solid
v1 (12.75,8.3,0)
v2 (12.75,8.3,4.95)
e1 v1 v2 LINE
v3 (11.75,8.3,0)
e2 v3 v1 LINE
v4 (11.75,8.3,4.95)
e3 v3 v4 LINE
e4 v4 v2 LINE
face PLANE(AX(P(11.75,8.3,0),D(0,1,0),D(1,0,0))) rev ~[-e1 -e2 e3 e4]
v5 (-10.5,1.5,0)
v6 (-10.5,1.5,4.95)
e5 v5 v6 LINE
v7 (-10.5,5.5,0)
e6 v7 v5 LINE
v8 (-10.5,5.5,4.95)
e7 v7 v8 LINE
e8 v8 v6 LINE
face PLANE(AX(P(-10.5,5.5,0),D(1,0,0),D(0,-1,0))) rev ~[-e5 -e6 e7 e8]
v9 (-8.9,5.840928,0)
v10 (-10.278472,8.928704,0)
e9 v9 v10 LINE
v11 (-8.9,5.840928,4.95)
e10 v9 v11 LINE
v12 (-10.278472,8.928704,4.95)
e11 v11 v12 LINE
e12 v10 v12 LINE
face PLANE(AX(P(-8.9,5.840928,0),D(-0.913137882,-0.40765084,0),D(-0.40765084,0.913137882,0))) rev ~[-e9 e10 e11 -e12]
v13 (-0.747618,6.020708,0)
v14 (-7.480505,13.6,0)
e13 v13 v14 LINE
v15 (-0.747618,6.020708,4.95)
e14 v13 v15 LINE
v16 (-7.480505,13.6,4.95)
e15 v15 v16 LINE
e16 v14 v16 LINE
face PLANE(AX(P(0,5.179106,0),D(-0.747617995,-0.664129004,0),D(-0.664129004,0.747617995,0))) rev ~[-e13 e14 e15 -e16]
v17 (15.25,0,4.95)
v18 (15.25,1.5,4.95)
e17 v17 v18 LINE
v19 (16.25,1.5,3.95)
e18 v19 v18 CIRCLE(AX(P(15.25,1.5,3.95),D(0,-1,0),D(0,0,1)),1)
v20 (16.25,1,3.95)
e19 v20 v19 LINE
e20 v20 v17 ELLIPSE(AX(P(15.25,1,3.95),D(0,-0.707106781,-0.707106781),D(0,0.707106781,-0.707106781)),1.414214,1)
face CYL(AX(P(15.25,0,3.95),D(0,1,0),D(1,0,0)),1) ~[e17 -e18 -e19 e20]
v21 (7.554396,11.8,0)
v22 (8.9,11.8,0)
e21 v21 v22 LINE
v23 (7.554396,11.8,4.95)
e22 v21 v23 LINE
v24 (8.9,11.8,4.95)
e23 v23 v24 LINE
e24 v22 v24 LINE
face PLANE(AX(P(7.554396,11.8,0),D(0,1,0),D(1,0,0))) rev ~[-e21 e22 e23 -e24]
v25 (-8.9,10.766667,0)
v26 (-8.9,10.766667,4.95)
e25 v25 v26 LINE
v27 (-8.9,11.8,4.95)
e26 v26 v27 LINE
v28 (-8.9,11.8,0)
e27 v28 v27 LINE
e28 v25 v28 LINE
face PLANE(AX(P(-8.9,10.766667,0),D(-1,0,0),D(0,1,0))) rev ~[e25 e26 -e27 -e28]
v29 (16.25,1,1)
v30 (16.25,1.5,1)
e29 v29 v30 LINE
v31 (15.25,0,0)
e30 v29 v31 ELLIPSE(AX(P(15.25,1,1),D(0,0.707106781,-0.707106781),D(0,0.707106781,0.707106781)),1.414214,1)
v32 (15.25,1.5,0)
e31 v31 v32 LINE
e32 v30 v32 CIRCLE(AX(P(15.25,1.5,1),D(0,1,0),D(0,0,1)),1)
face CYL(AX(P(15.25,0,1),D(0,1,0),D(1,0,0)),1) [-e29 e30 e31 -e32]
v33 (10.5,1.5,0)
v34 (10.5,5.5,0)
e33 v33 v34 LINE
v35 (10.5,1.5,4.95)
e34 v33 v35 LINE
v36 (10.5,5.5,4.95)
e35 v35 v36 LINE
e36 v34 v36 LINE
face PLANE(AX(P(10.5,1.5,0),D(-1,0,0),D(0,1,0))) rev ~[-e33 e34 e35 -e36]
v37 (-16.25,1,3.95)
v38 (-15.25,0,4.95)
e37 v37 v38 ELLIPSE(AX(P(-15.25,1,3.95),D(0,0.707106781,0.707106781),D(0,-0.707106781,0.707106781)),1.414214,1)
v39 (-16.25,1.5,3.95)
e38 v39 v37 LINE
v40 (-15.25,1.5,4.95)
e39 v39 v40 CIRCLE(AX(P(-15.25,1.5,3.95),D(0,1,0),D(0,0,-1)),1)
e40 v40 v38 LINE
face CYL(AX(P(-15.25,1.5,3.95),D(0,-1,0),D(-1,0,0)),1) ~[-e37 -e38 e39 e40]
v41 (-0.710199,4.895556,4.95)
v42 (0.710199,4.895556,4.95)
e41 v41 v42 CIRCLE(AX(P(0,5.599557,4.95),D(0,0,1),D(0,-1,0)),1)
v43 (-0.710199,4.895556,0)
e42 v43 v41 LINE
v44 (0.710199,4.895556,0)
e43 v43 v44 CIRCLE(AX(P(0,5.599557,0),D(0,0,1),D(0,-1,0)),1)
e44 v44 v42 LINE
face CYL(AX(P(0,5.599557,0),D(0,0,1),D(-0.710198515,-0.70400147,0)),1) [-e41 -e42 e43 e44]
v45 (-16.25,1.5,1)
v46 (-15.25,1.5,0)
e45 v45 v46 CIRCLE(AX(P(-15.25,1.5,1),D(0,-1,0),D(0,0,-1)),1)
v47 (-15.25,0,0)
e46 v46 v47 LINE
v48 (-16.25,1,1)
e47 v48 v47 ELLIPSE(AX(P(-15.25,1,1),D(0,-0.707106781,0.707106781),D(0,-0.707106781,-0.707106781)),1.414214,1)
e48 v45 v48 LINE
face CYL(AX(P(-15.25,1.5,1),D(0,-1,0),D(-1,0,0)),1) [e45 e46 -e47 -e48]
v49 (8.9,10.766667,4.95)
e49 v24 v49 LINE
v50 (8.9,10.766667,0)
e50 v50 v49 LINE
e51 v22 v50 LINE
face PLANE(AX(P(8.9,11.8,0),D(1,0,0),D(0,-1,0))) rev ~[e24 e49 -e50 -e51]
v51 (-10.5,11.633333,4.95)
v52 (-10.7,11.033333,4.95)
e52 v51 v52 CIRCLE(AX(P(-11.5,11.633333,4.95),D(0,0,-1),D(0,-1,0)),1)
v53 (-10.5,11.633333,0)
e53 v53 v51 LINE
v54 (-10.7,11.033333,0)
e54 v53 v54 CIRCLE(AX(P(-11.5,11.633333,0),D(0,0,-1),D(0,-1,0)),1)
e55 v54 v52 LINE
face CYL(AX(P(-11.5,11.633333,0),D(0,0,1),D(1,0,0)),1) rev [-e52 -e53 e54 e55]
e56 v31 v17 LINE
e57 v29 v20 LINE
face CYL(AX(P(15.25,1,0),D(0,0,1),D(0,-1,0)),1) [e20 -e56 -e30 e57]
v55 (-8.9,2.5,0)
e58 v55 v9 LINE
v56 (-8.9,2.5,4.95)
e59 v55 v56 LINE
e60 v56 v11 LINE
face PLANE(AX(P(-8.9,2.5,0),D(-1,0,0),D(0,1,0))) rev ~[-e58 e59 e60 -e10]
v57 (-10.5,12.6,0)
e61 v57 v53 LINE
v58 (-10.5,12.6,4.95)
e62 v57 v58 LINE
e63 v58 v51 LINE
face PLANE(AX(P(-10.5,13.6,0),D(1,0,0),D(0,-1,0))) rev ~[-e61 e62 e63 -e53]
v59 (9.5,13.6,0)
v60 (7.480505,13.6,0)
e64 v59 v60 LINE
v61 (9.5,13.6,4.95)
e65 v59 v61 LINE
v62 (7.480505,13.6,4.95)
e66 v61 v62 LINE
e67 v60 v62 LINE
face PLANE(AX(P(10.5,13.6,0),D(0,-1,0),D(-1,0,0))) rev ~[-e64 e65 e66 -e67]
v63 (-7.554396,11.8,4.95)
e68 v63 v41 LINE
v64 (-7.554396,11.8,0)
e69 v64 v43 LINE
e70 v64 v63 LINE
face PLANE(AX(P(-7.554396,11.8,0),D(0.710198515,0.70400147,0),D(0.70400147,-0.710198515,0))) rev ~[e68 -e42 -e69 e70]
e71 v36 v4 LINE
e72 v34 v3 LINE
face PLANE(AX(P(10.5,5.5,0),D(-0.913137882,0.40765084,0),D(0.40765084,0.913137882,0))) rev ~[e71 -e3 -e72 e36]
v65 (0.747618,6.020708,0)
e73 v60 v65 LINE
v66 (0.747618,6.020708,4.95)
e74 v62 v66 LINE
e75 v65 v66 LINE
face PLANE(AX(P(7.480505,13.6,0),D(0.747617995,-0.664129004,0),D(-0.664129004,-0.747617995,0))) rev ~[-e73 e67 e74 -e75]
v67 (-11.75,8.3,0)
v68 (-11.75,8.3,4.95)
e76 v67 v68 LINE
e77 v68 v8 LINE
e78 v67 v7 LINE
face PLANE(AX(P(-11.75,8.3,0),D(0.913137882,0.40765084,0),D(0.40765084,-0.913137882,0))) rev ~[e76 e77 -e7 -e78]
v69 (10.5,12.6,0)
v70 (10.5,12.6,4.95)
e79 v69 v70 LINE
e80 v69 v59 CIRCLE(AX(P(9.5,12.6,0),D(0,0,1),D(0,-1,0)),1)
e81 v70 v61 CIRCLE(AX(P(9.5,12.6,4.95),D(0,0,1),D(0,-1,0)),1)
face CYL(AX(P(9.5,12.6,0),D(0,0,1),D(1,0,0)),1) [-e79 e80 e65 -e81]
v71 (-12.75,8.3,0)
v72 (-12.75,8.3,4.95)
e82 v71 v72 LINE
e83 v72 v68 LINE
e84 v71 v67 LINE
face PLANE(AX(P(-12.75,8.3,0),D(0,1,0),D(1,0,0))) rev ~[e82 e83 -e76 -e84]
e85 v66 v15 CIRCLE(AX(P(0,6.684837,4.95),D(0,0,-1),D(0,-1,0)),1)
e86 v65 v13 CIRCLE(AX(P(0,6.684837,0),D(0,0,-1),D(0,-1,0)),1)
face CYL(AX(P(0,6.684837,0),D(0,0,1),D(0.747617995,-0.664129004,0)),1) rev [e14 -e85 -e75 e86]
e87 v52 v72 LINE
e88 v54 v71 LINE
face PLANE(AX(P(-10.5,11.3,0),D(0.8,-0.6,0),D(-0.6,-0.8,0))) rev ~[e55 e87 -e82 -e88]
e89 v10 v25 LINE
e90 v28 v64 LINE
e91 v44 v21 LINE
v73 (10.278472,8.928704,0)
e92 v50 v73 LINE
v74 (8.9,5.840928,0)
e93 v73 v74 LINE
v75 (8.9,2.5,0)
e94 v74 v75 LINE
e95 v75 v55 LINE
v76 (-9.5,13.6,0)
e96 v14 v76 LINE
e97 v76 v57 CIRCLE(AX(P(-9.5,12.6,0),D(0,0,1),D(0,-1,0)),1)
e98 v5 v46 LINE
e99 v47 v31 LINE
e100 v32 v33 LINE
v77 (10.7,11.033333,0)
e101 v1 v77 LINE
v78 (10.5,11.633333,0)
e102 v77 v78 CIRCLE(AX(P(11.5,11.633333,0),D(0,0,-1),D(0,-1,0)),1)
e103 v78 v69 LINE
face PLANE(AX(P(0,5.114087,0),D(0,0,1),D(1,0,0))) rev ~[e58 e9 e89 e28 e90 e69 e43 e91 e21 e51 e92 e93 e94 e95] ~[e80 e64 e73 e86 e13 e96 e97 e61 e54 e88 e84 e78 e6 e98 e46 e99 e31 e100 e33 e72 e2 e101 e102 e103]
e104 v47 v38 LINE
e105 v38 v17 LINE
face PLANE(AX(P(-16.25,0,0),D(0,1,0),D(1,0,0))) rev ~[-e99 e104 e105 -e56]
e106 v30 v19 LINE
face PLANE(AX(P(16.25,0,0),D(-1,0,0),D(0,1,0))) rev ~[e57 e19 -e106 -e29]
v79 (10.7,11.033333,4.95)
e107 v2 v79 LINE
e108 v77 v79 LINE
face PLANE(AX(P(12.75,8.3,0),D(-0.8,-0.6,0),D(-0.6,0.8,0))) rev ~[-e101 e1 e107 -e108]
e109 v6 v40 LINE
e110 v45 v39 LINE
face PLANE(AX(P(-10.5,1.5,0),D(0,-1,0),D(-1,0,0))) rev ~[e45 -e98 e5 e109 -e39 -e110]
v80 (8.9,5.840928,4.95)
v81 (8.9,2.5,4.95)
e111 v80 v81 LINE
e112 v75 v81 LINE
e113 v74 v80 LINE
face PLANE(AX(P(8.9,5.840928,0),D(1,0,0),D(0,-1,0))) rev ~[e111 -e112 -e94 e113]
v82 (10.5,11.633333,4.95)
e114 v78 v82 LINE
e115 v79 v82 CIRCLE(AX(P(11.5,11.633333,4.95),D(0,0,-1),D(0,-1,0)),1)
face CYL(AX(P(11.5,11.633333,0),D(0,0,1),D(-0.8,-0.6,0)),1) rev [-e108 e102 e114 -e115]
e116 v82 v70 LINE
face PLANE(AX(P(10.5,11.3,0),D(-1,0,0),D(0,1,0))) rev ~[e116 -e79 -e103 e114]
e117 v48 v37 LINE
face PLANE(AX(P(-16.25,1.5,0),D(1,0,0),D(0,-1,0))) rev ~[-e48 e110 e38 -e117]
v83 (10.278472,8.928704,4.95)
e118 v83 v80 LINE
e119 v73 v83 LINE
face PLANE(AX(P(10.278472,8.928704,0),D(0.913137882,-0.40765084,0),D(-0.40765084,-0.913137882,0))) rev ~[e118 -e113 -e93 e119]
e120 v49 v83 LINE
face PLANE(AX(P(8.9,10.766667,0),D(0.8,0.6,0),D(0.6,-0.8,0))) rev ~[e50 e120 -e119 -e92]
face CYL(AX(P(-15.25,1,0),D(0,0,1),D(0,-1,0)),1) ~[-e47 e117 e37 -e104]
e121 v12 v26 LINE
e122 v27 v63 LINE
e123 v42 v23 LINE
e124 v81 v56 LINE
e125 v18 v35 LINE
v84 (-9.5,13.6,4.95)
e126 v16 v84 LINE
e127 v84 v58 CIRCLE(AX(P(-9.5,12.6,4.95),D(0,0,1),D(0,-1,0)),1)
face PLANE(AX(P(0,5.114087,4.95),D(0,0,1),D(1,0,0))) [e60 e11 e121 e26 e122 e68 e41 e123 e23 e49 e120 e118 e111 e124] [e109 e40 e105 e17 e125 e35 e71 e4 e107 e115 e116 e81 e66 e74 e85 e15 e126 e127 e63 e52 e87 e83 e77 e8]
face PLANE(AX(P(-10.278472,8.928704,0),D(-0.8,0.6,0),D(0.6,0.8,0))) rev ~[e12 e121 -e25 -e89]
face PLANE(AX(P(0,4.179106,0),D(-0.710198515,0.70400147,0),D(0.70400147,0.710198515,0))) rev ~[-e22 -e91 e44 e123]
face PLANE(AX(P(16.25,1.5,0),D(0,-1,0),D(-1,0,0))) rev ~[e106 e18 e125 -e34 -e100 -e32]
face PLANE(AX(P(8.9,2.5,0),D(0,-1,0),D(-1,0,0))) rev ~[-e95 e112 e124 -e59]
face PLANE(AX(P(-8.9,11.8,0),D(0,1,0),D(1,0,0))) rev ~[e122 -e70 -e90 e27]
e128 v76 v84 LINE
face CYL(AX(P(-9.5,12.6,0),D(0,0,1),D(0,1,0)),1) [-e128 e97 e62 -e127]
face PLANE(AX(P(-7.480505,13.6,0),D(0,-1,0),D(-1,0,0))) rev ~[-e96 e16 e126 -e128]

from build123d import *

# Parameters (mm, degrees)
F1_DEPTH = 4.95
F2_R     = 1


with BuildPart() as f1:
    # F0 (on Top) → F1 (new body)
    with BuildSketch(Plane.XY):
        Polygon((-16.25, 0), (0, 0), (16.25, 0), (16.25, 1.5), (10.5, 1.5), (10.5, 5.5), (11.75, 8.3), (12.75, 8.3), (10.5, 11.3), (10.5, 13.6000004441), (7.4805053882, 13.6000004441), (0, 5.1791056932), (-7.4805053882, 13.6000004441), (-10.5, 13.6000004441), (-10.5, 11.3), (-12.75, 8.3), (-11.75, 8.3), (-10.5, 5.5), (-10.5, 1.5), (-16.25, 1.5), align=None)
        Polygon((-10.2784717774, 8.9287042967), (-8.9, 10.7666666667), (-8.9, 11.8000004441), (-7.5543964098, 11.8000004441), (0, 4.1791056932), (7.5543964098, 11.8000004441), (8.9, 11.8000004441), (8.9, 10.7666666667), (10.2784717774, 8.9287042967), (8.9, 5.8409275153), (8.9, 2.5), (0, 2.5), (-8.9, 2.5), (-8.9, 5.8409275153), align=None, mode=Mode.SUBTRACT)
    extrude(amount=F1_DEPTH)

    # F2
    f2_edges = [f1.edges().sort_by_distance(p)[0] for p in [
        (-16.25, 0.75, 4.95),
        (-16.25, 0.75, 0),
        (16.25, 0.75, 4.95),
        (16.25, 0.75, 0),
        (-16.25, 0, 2.475),
        (16.25, 0, 2.475),
        (0, 5.179106, 2.475),
        (0, 4.179106, 2.475),
        (-10.5, 11.3, 2.475),
        (-10.5, 13.6, 2.475),
        (10.5, 13.6, 2.475),
        (10.5, 11.3, 2.475),
    ]]
    fillet(f2_edges, radius=F2_R)


solid = f1.part
